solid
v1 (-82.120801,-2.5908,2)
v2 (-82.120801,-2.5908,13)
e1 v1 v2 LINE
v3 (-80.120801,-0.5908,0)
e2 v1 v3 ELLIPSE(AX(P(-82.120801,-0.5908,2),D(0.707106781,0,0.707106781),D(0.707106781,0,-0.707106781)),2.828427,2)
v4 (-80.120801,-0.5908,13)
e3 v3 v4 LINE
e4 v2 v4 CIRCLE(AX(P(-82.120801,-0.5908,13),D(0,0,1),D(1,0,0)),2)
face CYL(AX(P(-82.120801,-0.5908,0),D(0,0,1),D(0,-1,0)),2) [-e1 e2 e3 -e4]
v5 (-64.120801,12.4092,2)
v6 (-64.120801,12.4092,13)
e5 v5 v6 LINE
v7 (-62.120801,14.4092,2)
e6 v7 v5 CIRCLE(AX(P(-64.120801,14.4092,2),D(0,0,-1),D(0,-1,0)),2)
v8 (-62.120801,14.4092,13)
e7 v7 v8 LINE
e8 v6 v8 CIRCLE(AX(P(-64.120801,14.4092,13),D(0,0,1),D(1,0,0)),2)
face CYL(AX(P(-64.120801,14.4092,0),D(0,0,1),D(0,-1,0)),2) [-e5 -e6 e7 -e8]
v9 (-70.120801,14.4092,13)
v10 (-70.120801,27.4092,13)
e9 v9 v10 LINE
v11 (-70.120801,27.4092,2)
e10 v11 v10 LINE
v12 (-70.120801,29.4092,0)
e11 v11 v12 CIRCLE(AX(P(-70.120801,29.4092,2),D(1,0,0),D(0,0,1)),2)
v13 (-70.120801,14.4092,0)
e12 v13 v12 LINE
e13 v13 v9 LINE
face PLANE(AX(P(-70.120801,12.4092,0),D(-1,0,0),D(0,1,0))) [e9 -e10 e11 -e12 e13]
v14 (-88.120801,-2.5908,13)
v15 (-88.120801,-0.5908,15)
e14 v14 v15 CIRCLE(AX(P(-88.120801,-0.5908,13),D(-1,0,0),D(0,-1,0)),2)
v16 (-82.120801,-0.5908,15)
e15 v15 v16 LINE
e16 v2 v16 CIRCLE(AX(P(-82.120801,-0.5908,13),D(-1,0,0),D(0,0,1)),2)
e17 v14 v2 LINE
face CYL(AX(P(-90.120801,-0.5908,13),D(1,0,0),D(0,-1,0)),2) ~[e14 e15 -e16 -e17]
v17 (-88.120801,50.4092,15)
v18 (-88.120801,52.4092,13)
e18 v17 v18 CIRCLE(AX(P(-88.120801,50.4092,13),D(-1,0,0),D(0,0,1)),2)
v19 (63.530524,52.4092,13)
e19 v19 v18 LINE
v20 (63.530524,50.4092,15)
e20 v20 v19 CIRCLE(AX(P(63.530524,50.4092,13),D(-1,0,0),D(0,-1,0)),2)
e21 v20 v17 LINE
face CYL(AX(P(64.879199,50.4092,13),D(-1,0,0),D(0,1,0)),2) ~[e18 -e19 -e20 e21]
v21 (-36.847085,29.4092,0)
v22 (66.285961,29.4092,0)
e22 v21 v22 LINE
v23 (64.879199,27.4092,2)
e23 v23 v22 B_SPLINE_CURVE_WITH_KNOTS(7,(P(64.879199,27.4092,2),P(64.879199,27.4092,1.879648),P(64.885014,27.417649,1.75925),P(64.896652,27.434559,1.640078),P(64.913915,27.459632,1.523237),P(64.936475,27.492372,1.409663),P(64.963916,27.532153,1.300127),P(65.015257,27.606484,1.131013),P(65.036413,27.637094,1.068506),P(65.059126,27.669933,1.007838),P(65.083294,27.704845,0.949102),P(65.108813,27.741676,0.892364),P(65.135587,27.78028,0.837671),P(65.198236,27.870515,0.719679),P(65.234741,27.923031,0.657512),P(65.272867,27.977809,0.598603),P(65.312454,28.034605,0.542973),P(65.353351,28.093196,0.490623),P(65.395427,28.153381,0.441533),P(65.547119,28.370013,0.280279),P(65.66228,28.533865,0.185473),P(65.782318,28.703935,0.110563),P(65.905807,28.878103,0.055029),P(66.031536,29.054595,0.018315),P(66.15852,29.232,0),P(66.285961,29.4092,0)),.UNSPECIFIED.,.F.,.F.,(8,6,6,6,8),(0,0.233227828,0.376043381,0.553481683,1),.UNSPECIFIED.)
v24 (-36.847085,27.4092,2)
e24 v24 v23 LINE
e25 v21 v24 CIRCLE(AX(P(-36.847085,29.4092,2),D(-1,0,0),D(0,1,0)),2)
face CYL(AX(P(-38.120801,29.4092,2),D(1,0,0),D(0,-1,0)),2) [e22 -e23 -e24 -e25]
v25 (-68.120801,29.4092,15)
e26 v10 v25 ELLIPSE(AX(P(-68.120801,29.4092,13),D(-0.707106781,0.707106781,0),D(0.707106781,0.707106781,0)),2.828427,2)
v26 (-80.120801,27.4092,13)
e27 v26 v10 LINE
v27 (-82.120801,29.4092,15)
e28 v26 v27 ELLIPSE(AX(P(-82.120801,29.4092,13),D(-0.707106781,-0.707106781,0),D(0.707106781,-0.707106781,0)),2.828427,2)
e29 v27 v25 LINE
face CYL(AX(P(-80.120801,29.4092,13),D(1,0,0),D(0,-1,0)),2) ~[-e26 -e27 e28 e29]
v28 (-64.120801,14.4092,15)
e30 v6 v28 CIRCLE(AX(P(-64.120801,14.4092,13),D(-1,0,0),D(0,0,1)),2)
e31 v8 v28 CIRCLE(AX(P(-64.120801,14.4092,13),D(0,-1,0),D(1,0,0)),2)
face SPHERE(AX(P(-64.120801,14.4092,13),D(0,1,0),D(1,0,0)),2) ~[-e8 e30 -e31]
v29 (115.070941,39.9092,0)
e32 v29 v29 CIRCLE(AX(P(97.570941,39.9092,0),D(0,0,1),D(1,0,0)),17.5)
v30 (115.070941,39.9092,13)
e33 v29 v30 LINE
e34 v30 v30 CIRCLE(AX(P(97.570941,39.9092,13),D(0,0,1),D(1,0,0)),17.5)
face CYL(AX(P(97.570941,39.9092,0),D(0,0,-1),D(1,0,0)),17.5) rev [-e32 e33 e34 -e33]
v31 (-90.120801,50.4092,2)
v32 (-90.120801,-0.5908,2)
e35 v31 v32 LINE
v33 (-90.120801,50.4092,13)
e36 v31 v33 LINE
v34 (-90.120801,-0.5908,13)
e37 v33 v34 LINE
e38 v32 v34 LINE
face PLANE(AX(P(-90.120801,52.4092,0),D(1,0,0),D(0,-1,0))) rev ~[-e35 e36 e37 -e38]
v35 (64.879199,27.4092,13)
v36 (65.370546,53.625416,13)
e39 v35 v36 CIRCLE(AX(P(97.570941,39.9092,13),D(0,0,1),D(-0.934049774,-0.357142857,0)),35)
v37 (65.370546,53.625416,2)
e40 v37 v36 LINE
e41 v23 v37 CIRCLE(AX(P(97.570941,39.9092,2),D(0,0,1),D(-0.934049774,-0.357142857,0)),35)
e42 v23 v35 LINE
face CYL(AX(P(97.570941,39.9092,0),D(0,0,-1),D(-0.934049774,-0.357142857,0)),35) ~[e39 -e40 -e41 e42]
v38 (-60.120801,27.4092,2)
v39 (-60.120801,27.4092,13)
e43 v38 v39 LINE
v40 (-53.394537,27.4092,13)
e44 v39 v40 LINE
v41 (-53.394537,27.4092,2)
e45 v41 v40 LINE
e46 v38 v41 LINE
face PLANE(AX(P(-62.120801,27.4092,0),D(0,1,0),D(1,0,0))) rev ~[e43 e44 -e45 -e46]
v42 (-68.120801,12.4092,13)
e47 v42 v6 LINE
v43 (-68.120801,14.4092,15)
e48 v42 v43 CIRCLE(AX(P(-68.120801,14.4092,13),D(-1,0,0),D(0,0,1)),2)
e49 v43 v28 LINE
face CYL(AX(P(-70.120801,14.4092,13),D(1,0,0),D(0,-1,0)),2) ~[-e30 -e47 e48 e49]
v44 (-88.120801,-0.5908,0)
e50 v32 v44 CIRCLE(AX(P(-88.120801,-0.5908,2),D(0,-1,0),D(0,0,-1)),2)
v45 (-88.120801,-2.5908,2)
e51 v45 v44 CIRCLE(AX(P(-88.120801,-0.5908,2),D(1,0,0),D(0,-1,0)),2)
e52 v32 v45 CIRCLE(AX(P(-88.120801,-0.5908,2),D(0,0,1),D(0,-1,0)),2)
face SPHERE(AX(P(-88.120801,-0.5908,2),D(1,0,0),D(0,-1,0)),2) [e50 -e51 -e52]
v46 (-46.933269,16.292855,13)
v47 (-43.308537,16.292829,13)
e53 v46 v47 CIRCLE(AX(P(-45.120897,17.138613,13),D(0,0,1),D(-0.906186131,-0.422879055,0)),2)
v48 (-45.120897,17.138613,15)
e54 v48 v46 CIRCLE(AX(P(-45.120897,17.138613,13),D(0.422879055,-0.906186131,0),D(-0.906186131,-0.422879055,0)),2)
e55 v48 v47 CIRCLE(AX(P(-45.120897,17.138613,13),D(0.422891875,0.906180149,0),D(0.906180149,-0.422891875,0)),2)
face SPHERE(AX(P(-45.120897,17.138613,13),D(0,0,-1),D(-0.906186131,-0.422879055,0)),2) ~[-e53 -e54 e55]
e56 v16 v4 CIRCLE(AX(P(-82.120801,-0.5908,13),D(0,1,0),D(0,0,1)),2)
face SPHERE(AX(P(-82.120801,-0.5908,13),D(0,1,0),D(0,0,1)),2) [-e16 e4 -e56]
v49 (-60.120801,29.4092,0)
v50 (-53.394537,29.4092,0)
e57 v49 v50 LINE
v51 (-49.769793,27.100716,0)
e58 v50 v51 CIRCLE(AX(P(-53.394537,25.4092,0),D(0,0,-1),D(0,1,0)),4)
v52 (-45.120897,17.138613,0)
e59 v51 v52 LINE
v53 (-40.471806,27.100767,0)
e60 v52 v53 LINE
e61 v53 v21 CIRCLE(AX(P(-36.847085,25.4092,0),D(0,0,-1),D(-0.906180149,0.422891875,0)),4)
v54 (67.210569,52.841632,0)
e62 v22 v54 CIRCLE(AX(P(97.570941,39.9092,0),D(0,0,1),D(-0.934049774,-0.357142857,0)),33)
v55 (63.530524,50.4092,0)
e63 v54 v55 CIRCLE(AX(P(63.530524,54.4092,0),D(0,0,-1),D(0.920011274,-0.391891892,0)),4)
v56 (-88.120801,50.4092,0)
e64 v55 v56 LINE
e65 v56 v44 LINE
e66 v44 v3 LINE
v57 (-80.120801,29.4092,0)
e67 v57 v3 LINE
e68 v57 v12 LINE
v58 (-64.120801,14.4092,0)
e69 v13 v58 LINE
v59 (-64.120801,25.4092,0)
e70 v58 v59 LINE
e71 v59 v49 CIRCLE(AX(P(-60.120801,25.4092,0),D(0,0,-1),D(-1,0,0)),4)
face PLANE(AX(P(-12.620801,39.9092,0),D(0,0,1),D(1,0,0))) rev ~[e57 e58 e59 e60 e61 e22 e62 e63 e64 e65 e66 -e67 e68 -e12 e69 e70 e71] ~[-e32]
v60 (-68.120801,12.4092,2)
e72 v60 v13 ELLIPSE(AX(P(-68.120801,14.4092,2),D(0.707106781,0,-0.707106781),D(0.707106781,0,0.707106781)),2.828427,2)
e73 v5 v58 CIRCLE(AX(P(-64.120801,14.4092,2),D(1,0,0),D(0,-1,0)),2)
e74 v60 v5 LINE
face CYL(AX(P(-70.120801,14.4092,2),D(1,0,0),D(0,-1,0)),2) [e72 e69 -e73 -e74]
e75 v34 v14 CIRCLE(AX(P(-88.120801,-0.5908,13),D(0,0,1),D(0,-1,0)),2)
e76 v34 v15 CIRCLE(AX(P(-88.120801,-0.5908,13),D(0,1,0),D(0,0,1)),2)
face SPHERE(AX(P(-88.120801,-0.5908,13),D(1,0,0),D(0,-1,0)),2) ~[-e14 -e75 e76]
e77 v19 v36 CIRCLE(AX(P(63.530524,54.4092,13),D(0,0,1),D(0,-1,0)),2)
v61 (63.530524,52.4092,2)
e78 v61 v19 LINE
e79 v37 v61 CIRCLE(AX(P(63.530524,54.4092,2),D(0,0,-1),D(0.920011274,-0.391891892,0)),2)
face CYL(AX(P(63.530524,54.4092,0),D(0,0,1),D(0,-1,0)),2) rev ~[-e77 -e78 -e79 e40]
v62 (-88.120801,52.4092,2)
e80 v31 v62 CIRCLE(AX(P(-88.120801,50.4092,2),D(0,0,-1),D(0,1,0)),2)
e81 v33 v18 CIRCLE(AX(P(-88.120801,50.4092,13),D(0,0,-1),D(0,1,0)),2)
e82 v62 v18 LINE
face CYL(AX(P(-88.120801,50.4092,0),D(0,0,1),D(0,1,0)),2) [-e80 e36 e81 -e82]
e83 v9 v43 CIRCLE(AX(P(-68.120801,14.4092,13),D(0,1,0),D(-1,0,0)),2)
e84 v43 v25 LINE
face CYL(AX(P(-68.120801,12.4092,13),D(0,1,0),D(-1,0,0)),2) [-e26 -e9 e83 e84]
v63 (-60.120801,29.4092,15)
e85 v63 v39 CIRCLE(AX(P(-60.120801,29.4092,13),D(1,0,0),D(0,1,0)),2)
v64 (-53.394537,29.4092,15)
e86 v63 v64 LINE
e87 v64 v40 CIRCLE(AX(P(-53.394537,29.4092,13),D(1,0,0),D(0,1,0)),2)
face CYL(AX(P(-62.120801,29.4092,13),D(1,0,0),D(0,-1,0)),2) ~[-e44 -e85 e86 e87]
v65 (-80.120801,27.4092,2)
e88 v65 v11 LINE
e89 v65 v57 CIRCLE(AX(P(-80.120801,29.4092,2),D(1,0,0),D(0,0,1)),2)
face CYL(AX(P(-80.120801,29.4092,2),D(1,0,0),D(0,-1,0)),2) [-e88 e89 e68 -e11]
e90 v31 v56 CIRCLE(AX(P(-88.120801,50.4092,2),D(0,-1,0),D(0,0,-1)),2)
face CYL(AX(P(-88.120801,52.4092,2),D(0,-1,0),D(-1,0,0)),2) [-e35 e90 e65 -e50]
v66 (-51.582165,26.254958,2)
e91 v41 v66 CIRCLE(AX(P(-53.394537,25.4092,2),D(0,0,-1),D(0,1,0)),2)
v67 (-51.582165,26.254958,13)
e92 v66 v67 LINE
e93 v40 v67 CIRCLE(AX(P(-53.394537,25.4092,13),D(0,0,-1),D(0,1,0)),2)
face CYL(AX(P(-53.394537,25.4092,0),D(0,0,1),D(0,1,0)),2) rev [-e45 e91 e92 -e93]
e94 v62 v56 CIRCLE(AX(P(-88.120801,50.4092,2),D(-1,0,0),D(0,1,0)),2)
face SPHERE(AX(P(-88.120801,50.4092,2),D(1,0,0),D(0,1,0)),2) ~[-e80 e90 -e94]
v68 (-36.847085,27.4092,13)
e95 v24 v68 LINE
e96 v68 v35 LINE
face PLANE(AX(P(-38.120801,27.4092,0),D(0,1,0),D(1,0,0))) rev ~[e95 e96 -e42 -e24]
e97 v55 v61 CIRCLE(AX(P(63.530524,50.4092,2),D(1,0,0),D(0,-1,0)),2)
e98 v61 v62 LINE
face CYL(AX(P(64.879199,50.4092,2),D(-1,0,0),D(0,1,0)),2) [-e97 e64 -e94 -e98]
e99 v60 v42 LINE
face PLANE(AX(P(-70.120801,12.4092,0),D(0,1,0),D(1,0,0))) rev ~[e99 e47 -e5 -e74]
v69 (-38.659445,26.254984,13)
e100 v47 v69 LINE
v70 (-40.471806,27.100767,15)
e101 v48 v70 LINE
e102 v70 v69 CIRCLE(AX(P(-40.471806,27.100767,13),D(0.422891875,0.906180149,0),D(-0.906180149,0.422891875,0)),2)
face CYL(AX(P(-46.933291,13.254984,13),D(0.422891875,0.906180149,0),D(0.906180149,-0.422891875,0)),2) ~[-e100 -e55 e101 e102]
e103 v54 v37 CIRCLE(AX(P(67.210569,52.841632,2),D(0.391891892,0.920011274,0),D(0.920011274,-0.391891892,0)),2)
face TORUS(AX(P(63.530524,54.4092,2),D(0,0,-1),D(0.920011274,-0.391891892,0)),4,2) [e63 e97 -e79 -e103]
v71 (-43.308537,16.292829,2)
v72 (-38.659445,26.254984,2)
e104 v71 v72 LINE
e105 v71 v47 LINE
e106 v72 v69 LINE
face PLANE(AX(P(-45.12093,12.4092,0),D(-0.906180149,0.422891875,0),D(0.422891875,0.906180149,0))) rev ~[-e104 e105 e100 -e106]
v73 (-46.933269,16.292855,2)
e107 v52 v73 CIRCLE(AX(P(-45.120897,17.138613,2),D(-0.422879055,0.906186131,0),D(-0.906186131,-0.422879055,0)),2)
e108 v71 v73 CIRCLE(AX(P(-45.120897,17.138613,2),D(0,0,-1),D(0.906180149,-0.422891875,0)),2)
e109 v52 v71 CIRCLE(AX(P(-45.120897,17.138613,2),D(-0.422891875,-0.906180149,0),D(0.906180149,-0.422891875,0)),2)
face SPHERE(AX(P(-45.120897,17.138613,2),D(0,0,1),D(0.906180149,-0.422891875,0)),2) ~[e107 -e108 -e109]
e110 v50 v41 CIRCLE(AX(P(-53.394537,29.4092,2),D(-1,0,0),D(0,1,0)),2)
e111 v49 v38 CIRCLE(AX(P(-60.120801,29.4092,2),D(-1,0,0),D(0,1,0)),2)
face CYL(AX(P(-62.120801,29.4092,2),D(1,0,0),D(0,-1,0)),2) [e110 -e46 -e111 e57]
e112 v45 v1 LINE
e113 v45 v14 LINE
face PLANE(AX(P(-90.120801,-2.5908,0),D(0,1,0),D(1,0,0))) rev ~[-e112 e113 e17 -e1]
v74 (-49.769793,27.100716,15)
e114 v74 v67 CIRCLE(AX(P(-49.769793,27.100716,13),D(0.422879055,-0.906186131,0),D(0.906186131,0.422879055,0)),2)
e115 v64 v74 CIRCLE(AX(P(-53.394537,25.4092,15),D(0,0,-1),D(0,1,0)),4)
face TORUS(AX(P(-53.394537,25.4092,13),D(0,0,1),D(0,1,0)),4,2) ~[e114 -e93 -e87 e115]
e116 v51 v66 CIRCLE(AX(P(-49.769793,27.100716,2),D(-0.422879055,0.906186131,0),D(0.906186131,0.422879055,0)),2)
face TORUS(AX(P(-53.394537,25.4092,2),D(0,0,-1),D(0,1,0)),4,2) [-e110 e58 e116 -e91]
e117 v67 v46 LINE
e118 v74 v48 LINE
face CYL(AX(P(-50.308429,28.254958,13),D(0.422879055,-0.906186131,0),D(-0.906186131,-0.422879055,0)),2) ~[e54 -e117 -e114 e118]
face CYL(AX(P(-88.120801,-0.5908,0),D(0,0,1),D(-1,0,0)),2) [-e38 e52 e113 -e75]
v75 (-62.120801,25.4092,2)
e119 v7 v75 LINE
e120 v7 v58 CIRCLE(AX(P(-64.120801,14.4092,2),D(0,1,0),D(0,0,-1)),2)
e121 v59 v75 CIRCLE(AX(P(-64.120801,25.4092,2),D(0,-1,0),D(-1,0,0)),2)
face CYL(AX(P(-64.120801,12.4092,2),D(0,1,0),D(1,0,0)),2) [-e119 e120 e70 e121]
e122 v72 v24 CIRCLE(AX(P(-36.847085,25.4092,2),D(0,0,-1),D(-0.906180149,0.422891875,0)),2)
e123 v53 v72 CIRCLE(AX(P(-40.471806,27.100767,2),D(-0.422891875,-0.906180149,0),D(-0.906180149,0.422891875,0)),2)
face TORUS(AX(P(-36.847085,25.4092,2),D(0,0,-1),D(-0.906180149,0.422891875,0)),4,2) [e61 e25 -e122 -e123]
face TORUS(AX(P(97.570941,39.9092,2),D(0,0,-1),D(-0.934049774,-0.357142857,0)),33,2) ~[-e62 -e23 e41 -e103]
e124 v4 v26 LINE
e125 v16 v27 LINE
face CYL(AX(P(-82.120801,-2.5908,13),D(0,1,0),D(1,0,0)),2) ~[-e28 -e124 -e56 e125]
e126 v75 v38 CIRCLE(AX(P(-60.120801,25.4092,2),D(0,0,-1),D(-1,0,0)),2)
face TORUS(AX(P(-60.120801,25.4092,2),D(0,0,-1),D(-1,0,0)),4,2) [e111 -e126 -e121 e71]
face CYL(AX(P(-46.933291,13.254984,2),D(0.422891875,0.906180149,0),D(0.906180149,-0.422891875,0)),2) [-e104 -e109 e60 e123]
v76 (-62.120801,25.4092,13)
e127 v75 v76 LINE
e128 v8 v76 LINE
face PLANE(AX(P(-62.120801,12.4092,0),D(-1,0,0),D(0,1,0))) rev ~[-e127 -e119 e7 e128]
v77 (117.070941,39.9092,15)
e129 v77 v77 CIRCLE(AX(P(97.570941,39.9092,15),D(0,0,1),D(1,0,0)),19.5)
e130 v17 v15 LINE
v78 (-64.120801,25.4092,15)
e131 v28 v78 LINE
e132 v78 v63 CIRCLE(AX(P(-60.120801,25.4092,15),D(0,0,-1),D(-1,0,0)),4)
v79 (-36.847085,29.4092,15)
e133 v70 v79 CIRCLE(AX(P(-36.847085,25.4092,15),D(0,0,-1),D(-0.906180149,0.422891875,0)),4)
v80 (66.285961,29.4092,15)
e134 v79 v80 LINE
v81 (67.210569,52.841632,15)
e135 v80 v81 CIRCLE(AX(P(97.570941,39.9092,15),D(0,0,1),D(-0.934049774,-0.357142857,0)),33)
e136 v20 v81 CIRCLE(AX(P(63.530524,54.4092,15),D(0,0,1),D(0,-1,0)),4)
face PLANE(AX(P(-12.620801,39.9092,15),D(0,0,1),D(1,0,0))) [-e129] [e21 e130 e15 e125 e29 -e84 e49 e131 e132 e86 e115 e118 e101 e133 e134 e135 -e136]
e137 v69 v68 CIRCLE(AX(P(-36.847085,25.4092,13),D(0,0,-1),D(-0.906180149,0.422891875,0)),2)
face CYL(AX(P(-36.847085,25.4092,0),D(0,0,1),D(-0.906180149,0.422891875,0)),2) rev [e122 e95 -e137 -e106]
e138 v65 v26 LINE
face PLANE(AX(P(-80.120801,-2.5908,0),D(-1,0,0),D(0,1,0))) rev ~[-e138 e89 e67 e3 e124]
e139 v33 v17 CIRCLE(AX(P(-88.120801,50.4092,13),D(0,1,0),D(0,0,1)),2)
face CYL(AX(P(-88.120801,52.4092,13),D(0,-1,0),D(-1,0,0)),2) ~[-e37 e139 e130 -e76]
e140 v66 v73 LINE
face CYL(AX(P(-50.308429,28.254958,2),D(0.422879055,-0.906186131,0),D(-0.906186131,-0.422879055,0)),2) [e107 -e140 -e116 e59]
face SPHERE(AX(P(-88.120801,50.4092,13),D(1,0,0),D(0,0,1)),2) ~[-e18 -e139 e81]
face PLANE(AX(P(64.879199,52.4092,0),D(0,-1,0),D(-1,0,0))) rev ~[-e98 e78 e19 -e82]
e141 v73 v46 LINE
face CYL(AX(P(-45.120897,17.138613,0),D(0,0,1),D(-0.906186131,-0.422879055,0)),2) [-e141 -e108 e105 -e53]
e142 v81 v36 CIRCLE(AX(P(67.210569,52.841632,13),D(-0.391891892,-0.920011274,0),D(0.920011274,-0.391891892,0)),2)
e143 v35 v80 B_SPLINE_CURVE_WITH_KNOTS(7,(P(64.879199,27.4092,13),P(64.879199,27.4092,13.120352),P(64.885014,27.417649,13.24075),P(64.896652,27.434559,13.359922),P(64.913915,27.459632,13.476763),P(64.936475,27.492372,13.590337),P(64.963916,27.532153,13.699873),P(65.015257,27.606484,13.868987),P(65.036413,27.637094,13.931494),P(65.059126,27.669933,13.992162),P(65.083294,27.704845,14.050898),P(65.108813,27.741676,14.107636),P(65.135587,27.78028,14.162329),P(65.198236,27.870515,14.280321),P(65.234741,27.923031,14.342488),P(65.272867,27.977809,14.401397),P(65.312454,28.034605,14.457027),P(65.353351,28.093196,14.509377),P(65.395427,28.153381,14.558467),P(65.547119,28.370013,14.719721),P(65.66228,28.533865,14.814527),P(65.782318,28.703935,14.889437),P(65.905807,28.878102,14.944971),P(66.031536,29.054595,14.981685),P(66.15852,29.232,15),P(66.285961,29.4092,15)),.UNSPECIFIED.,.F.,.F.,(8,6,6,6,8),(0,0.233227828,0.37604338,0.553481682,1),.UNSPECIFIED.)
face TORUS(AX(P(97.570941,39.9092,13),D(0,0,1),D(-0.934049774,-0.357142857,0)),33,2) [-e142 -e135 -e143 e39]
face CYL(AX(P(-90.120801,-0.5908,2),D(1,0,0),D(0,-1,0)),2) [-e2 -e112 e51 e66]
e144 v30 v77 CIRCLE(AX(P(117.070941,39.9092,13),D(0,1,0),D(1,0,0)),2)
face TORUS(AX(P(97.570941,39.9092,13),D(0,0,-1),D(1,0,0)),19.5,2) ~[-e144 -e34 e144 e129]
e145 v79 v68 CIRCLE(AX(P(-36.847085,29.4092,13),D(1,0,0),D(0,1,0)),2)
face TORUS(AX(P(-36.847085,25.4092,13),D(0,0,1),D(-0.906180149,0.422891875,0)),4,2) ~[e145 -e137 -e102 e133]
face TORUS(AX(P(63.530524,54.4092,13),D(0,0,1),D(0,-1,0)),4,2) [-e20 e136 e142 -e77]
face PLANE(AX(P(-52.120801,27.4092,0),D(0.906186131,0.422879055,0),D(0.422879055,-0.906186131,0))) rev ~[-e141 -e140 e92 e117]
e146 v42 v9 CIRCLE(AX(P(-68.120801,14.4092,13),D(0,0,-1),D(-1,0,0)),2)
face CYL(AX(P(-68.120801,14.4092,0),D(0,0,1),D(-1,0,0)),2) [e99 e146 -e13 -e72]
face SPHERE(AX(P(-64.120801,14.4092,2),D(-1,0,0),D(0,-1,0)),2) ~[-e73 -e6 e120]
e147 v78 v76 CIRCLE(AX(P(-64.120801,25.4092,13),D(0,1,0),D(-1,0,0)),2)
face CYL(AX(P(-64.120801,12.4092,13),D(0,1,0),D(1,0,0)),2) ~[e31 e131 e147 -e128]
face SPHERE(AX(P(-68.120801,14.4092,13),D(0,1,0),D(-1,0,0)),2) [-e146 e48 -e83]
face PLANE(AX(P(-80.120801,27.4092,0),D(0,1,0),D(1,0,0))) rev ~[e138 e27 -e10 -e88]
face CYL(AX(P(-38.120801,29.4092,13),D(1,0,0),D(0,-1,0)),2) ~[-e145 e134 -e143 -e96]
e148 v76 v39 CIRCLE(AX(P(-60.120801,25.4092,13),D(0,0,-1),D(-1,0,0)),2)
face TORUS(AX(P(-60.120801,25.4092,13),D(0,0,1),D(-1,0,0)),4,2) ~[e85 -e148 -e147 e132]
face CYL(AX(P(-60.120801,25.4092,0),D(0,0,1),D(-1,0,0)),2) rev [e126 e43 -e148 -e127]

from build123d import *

# Parameters (mm, degrees)
F0_R     = 17.5
F0_W     = 10
F0_H     = 30
F0_W_2   = 8
F0_H_2   = 15
F1_DEPTH = 15
F2_R     = 2


with BuildPart() as f1:
    # F0 (on Top) → F1 (new body)
    with BuildSketch(Plane.XY):
        Polygon((64.8791989386, 52.4091998301), (-90.1208010614, 52.4091998301), (-90.1208010614, 27.4091998301), (-80.1208010614, 27.4091998301), (-70.1208010614, 27.4091998301), (-62.1208010614, 27.4091998301), (-52.1208010614, 27.4091998301), (-45.1209302745, 27.4091998301), (-38.1208010614, 27.4091998301), (64.8791989386, 27.4091998301), align=None)
        with BuildLine():
            ThreePointArc((64.8791989386, 27.4091998301), (132.5709410152, 39.9091998301), (64.8791989386, 52.4091998301))
            Line((64.8791989386, 52.4091998301), (64.8791989386, 27.4091998301))
        make_face()
        with Locations((97.5709410152, 39.9091998301)):
            Circle(F0_R, mode=Mode.SUBTRACT)
        with Locations((-85.1208010614, 12.4091998301)):
            Rectangle(F0_W, F0_H)
        Polygon((-45.1209302745, 12.4091998301), (-38.1208010614, 27.4091998301), (-45.1209302745, 27.4091998301), (-52.1208010614, 27.4091998301), align=None)
        with Locations((-66.1208010614, 19.9091998301)):
            Rectangle(F0_W_2, F0_H_2)
    extrude(amount=F1_DEPTH)

    # F2
    f2_edges = [f1.edges().sort_by_distance(p)[0] for p in [
        (-75.120801, 27.4092, 15),
        (-70.120801, 19.9092, 15),
        (-62.120801, 19.9092, 15),
        (-66.120801, 12.4092, 0),
        (-62.120801, 12.4092, 7.5),
        (-70.120801, 12.4092, 7.5),
        (-80.120801, 12.4092, 15),
        (-85.120801, -2.5908, 15),
        (-85.120801, -2.5908, 0),
        (-90.120801, -2.5908, 7.5),
        (-80.120801, -2.5908, 7.5),
        (-75.120801, 27.4092, 0),
        (-66.120801, 12.4092, 15),
        (-12.620801, 52.4092, 15),
        (-90.120801, 24.9092, 15),
        (-57.120801, 27.4092, 15),
        (-48.620866, 19.9092, 15),
        (-41.620866, 19.9092, 15),
        (13.379199, 27.4092, 15),
        (132.570941, 39.9092, 15),
        (80.070941, 39.9092, 15),
        (-45.12093, 12.4092, 7.5),
        (-38.120801, 27.4092, 7.5),
        (-41.620866, 19.9092, 0),
        (-48.620866, 19.9092, 0),
        (13.379199, 27.4092, 0),
        (132.570941, 39.9092, 0),
        (-12.620801, 52.4092, 0),
        (64.879199, 52.4092, 7.5),
        (-90.120801, 52.4092, 7.5),
        (-90.120801, 24.9092, 0),
        (-62.120801, 27.4092, 7.5),
        (-62.120801, 19.9092, 0),
        (-52.120801, 27.4092, 7.5),
        (-57.120801, 27.4092, 0),
    ]]
    fillet(f2_edges, radius=F2_R)


solid = f1.part
